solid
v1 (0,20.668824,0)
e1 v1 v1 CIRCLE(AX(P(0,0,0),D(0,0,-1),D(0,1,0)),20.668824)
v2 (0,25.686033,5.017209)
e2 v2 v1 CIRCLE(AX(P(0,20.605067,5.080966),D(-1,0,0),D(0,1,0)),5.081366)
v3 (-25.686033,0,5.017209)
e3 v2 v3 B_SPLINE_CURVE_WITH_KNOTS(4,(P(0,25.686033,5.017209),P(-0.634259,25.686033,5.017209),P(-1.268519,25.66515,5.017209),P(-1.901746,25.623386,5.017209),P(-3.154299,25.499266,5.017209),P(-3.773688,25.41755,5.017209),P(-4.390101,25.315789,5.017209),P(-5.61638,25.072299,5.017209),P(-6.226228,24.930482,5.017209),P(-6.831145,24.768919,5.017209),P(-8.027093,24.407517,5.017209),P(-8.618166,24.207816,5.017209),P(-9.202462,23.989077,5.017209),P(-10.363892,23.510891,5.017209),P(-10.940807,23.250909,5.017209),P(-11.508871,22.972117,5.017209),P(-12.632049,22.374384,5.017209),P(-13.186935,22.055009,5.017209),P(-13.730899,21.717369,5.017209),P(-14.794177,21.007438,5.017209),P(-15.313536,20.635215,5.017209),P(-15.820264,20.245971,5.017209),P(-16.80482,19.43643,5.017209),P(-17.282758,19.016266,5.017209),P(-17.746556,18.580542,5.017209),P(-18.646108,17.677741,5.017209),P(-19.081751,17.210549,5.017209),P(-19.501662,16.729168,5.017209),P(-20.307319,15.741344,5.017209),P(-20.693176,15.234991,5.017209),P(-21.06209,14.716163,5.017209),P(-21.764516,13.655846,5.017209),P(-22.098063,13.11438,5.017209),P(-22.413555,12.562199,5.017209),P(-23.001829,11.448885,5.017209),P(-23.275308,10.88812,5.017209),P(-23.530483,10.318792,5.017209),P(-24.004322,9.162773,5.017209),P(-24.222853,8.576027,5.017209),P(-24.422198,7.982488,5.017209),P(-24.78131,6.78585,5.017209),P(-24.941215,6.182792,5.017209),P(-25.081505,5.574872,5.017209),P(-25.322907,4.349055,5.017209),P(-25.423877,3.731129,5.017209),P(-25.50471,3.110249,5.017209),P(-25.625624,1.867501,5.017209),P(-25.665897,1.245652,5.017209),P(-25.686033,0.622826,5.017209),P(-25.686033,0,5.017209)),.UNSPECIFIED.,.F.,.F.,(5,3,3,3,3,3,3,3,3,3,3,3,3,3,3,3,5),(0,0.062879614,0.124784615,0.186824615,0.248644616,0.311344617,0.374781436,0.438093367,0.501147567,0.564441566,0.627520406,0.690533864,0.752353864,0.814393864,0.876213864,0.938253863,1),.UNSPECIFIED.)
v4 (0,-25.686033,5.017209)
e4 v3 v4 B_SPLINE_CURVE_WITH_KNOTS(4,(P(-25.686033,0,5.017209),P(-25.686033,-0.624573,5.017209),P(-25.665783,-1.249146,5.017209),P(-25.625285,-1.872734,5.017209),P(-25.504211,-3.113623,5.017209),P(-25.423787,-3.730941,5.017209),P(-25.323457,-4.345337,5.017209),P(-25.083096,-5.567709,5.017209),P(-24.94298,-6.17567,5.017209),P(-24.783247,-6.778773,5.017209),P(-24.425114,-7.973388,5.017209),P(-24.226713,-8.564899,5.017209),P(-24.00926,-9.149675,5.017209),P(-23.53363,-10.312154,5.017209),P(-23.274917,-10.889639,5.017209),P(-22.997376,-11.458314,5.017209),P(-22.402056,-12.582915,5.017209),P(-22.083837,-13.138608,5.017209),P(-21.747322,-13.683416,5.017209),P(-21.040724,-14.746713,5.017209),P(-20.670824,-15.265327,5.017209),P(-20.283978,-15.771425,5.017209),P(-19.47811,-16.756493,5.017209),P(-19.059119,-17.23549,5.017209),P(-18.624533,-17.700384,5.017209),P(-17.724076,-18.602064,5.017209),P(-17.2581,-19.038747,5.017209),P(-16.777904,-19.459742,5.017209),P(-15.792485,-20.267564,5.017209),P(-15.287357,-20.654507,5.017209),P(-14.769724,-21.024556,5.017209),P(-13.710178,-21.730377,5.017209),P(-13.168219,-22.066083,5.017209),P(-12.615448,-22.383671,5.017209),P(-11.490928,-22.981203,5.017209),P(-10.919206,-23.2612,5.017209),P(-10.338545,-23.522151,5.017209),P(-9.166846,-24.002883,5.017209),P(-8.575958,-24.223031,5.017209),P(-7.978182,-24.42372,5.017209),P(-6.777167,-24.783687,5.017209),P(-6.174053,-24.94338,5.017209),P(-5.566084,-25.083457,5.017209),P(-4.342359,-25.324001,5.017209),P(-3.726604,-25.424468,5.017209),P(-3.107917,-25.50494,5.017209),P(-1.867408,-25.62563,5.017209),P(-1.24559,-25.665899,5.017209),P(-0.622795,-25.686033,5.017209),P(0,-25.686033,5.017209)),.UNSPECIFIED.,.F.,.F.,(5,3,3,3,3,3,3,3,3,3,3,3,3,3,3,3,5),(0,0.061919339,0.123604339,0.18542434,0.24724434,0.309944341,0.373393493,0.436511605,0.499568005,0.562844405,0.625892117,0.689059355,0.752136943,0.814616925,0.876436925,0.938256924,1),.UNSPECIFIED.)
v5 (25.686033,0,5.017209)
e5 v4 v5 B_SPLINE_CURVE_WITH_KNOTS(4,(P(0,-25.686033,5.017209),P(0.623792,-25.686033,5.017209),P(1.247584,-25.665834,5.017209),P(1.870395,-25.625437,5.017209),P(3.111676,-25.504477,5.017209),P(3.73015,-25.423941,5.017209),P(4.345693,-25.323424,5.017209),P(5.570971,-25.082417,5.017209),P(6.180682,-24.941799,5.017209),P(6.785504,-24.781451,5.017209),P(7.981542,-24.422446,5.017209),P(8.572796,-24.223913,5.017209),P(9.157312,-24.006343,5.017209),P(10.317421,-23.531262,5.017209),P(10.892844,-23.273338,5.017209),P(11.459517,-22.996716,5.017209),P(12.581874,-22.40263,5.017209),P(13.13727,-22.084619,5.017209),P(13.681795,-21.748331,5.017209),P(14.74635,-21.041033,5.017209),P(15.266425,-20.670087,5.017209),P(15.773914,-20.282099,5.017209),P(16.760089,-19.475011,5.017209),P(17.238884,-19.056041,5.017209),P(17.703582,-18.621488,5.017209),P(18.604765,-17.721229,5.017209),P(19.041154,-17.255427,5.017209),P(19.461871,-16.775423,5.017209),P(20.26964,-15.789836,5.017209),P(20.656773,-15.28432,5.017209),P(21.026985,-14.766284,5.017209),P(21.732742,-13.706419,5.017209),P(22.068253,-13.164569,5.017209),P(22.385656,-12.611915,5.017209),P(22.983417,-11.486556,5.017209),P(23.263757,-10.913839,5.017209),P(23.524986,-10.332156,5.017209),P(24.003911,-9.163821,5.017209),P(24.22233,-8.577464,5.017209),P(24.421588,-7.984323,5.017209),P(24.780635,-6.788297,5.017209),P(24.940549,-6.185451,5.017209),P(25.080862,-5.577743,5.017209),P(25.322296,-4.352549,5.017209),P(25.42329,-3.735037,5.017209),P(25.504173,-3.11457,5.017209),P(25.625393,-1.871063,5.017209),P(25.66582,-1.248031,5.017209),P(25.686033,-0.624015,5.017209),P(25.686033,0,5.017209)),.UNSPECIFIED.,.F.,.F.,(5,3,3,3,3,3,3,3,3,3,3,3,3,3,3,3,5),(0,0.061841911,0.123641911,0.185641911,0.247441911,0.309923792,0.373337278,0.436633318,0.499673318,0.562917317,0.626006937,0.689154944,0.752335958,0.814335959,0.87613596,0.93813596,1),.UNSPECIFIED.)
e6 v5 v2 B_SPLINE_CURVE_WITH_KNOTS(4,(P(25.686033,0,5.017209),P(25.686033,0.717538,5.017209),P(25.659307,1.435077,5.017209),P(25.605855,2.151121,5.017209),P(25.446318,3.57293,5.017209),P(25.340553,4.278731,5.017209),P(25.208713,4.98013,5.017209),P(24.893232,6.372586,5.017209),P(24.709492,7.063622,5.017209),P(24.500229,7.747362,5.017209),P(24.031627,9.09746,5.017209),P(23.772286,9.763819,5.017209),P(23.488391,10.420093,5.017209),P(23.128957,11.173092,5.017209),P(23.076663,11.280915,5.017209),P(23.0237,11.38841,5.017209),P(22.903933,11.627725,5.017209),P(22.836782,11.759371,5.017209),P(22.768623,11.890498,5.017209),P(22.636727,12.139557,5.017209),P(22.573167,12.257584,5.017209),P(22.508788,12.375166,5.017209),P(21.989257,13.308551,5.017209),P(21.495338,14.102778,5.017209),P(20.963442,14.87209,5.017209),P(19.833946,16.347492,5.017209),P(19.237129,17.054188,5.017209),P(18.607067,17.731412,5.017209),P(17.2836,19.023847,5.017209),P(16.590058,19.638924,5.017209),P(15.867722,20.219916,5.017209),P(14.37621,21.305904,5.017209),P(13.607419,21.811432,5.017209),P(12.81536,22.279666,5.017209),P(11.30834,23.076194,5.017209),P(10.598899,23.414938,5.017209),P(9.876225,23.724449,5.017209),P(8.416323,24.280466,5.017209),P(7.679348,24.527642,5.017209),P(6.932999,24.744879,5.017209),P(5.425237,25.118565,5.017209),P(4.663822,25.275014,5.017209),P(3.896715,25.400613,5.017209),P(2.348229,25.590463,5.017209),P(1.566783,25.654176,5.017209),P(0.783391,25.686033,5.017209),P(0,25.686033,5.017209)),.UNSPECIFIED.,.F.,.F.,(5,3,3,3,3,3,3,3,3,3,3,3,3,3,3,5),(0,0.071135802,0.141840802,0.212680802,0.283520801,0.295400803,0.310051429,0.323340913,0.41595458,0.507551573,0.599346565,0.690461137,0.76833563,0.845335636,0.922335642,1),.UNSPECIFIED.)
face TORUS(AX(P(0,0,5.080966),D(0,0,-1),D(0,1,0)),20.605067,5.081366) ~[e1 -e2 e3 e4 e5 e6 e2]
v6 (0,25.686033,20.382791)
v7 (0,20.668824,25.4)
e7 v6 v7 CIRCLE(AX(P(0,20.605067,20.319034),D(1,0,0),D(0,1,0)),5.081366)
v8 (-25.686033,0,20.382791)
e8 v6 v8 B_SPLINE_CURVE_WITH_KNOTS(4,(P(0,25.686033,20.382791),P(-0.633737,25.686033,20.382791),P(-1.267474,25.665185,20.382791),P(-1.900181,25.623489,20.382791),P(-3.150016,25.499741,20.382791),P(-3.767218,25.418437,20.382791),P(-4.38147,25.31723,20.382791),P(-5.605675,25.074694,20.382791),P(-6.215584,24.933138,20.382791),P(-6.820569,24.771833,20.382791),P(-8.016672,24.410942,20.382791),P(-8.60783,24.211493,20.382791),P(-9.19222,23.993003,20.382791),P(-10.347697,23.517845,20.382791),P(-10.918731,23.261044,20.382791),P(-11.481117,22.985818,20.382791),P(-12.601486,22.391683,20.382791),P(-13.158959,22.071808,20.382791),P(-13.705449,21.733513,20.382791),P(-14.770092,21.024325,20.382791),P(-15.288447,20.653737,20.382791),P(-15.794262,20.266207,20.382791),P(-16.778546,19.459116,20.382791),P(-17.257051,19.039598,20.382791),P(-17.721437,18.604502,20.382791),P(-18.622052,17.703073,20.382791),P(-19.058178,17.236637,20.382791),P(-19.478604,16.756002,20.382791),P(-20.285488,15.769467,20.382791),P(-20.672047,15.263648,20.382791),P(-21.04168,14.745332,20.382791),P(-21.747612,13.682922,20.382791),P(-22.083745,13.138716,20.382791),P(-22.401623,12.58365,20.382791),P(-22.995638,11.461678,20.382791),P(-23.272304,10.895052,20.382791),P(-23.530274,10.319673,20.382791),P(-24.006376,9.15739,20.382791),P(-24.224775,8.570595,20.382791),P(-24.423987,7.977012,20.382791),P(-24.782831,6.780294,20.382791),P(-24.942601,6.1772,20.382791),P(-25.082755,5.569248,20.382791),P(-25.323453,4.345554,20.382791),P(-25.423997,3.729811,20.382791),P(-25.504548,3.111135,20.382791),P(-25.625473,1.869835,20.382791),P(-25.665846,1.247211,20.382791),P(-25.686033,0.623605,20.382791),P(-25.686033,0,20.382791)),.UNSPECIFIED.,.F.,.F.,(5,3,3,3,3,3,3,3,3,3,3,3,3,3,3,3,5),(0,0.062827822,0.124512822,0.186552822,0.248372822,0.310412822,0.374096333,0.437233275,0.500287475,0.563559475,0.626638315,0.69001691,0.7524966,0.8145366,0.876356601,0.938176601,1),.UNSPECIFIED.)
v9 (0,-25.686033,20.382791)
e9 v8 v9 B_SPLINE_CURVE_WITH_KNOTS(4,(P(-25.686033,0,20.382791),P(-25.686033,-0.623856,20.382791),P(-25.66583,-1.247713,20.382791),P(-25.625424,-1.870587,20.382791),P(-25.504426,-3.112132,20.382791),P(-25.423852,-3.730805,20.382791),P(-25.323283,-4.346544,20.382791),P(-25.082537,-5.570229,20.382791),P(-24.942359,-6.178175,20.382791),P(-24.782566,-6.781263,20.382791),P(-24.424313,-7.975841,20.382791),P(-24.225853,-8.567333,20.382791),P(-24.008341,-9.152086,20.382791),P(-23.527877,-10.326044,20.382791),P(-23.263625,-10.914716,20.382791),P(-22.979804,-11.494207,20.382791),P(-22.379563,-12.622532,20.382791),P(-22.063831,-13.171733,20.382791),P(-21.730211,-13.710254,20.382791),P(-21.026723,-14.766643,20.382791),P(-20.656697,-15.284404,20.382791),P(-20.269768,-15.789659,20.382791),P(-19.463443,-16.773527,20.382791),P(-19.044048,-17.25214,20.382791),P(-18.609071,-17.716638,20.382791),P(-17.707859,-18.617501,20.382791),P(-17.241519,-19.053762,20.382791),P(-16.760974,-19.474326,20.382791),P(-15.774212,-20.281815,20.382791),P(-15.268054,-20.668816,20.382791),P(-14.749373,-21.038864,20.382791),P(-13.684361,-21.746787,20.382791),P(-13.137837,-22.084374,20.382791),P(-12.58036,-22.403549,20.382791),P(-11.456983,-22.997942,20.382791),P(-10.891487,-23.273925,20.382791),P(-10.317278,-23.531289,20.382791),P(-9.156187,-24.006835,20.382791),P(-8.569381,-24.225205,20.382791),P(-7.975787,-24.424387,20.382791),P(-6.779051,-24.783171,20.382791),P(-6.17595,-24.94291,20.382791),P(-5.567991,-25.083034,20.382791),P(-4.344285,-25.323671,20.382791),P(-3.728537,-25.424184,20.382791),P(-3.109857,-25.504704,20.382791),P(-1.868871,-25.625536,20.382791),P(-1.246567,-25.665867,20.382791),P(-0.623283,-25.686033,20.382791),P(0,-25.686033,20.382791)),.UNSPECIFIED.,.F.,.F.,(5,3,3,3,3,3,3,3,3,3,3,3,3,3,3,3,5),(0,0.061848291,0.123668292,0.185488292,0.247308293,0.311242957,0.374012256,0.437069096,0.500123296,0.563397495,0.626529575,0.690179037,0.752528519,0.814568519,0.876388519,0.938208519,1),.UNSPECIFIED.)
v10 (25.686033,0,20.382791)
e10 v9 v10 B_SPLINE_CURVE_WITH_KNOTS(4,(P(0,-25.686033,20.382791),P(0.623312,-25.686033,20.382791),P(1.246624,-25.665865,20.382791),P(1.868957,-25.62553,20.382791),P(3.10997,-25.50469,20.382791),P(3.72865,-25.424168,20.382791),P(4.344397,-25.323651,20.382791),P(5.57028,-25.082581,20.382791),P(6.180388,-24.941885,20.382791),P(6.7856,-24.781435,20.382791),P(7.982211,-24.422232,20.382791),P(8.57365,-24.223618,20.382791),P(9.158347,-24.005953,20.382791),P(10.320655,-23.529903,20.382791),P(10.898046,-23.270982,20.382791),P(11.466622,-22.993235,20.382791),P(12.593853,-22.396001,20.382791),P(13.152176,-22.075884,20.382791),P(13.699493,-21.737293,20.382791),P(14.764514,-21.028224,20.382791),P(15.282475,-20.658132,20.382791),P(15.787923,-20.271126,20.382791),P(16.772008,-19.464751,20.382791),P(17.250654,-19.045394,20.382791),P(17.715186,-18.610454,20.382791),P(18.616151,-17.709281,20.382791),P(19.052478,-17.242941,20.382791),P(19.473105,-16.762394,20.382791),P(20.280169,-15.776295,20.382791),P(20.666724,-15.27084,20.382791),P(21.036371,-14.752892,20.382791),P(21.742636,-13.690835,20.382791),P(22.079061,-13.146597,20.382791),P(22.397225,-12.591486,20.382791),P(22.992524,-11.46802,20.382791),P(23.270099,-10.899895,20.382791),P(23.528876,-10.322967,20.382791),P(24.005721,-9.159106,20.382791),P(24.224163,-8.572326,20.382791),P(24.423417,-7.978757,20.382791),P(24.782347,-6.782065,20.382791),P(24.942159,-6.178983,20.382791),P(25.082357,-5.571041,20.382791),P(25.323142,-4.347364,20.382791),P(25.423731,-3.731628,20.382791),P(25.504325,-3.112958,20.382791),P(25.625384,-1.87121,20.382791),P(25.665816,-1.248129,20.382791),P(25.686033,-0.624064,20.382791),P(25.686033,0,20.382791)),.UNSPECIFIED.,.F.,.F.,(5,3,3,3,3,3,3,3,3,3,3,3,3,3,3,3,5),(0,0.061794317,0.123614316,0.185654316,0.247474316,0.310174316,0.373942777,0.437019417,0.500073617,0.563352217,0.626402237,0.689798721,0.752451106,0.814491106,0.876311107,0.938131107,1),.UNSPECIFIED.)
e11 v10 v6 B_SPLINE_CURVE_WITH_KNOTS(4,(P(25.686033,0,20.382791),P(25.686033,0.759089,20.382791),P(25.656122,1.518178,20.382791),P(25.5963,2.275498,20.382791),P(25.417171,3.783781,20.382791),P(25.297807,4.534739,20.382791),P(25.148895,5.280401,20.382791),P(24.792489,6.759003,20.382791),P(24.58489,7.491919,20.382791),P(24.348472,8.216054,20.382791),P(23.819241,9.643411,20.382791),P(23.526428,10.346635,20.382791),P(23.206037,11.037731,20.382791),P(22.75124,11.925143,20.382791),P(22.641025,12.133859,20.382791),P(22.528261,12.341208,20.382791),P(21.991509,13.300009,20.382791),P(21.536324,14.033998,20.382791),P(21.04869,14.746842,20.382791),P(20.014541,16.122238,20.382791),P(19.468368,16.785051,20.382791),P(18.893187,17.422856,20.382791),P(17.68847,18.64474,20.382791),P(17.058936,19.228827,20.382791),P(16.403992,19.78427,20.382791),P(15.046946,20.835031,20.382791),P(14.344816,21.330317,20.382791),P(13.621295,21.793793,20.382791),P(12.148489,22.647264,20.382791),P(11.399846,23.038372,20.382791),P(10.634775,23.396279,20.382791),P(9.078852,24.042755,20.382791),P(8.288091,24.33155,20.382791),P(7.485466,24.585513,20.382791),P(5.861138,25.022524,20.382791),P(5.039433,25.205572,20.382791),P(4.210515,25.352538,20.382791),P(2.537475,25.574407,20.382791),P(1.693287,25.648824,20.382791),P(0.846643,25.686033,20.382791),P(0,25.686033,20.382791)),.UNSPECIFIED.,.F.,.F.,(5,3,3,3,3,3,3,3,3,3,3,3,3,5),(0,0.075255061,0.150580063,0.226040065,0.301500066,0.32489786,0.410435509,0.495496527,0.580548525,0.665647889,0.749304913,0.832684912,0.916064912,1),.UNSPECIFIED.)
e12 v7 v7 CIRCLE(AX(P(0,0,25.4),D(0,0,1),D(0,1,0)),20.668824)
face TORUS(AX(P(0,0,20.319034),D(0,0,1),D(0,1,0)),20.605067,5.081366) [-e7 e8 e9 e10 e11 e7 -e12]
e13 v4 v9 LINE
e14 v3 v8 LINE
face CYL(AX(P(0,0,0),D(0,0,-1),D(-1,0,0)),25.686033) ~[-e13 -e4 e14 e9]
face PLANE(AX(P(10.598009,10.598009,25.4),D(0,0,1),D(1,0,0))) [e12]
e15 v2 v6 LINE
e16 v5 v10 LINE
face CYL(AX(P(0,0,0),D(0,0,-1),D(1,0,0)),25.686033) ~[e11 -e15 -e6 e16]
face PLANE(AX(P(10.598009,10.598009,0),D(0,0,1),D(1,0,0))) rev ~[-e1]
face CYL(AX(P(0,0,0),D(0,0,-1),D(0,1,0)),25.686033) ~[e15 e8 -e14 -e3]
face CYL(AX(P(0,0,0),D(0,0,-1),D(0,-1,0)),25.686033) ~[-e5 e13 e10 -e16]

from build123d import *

# Parameters (mm, degrees)
F1_DEPTH = 25.4


# Not quite as in the source:
# - a fillet or chamfer that OpenCascade refuses, or shapes differently, is made with other operations: its cross-section is extruded or revolved along the edge and cut away or added


with BuildPart() as f1:
    # F0 (on Top) → F1 (new body)
    with BuildSketch(Plane.XY):
        with BuildLine():
            Line((0, 0), (25.6860326238, 0))
            ThreePointArc((25.6860326238, 0), (18.1627678501, 18.1627678501), (0, 25.6860326238))
            Line((0, 25.6860326238), (0, 0))
        make_face()
        with BuildLine():
            ThreePointArc((0, -25.6860326238), (18.1627678501, -18.1627678501), (25.6860326238, 0))
            Line((25.6860326238, 0), (0, 0))
            Line((0, 0), (0, -25.6860326238))
        make_face()
        with BuildLine():
            ThreePointArc((-25.6860326238, 0), (-18.1627678501, -18.1627678501), (0, -25.6860326238))
            Line((0, -25.6860326238), (0, 0))
            Line((0, 0), (-25.6860326238, 0))
        make_face()
        with BuildLine():
            Line((0, 0), (0, 25.6860326238))
            ThreePointArc((0, 25.6860326238), (-18.1627678501, 18.1627678501), (-25.6860326238, 0))
            Line((-25.6860326238, 0), (0, 0))
        make_face()
    extrude(amount=F1_DEPTH)

    # F2: fillet of radius 5.08 on 3 edges, made by hand

    # F2_s1 → F2_t2 (revolve, cut)
    with BuildSketch(Plane.YZ):
        with BuildLine():
            ThreePointArc((25.6864326238, 20.3190343146), (24.1981350723, 23.9121024484), (20.6050669384, 25.4004))
            Line((20.6050669384, 25.4004), (20.6050669384, 25.9085365685))
            ThreePointArc((20.6050669384, 25.9085365685), (23.1455497811, 25.9081365685), (25.6860326238, 25.9081365685))
            Line((25.6860326238, 25.9081365685), (26.1941691924, 25.4))
            ThreePointArc((26.1941691924, 25.4), (26.1941691924, 22.8595171573), (26.1945691924, 20.3190343146))
            Line((26.1945691924, 20.3190343146), (25.6864326238, 20.3190343146))
        make_face()
    revolve(axis=Axis((0, 0, 25.4), (0, 0, 1)), mode=Mode.SUBTRACT)

    # F2_s3 → F2_t4 (revolve, cut)
    with BuildSketch(Plane.YZ):
        with BuildLine():
            ThreePointArc((25.6864326238, 5.0809656854), (24.1981350723, 1.4878975516), (20.6050669384, -0.0004))
            Line((20.6050669384, -0.0004), (20.6050669384, -0.5085365685))
            ThreePointArc((20.6050669384, -0.5085365685), (23.1455497811, -0.5081365685), (25.6860326238, -0.5081365685))
            Line((25.6860326238, -0.5081365685), (26.1941691924, 0))
            ThreePointArc((26.1941691924, 0), (26.1941691924, 2.5404828427), (26.1945691924, 5.0809656854))
            Line((26.1945691924, 5.0809656854), (25.6864326238, 5.0809656854))
        make_face()
    revolve(axis=Axis((0, 0, 0), (0, 0, 1)), mode=Mode.SUBTRACT)


solid = f1.part
